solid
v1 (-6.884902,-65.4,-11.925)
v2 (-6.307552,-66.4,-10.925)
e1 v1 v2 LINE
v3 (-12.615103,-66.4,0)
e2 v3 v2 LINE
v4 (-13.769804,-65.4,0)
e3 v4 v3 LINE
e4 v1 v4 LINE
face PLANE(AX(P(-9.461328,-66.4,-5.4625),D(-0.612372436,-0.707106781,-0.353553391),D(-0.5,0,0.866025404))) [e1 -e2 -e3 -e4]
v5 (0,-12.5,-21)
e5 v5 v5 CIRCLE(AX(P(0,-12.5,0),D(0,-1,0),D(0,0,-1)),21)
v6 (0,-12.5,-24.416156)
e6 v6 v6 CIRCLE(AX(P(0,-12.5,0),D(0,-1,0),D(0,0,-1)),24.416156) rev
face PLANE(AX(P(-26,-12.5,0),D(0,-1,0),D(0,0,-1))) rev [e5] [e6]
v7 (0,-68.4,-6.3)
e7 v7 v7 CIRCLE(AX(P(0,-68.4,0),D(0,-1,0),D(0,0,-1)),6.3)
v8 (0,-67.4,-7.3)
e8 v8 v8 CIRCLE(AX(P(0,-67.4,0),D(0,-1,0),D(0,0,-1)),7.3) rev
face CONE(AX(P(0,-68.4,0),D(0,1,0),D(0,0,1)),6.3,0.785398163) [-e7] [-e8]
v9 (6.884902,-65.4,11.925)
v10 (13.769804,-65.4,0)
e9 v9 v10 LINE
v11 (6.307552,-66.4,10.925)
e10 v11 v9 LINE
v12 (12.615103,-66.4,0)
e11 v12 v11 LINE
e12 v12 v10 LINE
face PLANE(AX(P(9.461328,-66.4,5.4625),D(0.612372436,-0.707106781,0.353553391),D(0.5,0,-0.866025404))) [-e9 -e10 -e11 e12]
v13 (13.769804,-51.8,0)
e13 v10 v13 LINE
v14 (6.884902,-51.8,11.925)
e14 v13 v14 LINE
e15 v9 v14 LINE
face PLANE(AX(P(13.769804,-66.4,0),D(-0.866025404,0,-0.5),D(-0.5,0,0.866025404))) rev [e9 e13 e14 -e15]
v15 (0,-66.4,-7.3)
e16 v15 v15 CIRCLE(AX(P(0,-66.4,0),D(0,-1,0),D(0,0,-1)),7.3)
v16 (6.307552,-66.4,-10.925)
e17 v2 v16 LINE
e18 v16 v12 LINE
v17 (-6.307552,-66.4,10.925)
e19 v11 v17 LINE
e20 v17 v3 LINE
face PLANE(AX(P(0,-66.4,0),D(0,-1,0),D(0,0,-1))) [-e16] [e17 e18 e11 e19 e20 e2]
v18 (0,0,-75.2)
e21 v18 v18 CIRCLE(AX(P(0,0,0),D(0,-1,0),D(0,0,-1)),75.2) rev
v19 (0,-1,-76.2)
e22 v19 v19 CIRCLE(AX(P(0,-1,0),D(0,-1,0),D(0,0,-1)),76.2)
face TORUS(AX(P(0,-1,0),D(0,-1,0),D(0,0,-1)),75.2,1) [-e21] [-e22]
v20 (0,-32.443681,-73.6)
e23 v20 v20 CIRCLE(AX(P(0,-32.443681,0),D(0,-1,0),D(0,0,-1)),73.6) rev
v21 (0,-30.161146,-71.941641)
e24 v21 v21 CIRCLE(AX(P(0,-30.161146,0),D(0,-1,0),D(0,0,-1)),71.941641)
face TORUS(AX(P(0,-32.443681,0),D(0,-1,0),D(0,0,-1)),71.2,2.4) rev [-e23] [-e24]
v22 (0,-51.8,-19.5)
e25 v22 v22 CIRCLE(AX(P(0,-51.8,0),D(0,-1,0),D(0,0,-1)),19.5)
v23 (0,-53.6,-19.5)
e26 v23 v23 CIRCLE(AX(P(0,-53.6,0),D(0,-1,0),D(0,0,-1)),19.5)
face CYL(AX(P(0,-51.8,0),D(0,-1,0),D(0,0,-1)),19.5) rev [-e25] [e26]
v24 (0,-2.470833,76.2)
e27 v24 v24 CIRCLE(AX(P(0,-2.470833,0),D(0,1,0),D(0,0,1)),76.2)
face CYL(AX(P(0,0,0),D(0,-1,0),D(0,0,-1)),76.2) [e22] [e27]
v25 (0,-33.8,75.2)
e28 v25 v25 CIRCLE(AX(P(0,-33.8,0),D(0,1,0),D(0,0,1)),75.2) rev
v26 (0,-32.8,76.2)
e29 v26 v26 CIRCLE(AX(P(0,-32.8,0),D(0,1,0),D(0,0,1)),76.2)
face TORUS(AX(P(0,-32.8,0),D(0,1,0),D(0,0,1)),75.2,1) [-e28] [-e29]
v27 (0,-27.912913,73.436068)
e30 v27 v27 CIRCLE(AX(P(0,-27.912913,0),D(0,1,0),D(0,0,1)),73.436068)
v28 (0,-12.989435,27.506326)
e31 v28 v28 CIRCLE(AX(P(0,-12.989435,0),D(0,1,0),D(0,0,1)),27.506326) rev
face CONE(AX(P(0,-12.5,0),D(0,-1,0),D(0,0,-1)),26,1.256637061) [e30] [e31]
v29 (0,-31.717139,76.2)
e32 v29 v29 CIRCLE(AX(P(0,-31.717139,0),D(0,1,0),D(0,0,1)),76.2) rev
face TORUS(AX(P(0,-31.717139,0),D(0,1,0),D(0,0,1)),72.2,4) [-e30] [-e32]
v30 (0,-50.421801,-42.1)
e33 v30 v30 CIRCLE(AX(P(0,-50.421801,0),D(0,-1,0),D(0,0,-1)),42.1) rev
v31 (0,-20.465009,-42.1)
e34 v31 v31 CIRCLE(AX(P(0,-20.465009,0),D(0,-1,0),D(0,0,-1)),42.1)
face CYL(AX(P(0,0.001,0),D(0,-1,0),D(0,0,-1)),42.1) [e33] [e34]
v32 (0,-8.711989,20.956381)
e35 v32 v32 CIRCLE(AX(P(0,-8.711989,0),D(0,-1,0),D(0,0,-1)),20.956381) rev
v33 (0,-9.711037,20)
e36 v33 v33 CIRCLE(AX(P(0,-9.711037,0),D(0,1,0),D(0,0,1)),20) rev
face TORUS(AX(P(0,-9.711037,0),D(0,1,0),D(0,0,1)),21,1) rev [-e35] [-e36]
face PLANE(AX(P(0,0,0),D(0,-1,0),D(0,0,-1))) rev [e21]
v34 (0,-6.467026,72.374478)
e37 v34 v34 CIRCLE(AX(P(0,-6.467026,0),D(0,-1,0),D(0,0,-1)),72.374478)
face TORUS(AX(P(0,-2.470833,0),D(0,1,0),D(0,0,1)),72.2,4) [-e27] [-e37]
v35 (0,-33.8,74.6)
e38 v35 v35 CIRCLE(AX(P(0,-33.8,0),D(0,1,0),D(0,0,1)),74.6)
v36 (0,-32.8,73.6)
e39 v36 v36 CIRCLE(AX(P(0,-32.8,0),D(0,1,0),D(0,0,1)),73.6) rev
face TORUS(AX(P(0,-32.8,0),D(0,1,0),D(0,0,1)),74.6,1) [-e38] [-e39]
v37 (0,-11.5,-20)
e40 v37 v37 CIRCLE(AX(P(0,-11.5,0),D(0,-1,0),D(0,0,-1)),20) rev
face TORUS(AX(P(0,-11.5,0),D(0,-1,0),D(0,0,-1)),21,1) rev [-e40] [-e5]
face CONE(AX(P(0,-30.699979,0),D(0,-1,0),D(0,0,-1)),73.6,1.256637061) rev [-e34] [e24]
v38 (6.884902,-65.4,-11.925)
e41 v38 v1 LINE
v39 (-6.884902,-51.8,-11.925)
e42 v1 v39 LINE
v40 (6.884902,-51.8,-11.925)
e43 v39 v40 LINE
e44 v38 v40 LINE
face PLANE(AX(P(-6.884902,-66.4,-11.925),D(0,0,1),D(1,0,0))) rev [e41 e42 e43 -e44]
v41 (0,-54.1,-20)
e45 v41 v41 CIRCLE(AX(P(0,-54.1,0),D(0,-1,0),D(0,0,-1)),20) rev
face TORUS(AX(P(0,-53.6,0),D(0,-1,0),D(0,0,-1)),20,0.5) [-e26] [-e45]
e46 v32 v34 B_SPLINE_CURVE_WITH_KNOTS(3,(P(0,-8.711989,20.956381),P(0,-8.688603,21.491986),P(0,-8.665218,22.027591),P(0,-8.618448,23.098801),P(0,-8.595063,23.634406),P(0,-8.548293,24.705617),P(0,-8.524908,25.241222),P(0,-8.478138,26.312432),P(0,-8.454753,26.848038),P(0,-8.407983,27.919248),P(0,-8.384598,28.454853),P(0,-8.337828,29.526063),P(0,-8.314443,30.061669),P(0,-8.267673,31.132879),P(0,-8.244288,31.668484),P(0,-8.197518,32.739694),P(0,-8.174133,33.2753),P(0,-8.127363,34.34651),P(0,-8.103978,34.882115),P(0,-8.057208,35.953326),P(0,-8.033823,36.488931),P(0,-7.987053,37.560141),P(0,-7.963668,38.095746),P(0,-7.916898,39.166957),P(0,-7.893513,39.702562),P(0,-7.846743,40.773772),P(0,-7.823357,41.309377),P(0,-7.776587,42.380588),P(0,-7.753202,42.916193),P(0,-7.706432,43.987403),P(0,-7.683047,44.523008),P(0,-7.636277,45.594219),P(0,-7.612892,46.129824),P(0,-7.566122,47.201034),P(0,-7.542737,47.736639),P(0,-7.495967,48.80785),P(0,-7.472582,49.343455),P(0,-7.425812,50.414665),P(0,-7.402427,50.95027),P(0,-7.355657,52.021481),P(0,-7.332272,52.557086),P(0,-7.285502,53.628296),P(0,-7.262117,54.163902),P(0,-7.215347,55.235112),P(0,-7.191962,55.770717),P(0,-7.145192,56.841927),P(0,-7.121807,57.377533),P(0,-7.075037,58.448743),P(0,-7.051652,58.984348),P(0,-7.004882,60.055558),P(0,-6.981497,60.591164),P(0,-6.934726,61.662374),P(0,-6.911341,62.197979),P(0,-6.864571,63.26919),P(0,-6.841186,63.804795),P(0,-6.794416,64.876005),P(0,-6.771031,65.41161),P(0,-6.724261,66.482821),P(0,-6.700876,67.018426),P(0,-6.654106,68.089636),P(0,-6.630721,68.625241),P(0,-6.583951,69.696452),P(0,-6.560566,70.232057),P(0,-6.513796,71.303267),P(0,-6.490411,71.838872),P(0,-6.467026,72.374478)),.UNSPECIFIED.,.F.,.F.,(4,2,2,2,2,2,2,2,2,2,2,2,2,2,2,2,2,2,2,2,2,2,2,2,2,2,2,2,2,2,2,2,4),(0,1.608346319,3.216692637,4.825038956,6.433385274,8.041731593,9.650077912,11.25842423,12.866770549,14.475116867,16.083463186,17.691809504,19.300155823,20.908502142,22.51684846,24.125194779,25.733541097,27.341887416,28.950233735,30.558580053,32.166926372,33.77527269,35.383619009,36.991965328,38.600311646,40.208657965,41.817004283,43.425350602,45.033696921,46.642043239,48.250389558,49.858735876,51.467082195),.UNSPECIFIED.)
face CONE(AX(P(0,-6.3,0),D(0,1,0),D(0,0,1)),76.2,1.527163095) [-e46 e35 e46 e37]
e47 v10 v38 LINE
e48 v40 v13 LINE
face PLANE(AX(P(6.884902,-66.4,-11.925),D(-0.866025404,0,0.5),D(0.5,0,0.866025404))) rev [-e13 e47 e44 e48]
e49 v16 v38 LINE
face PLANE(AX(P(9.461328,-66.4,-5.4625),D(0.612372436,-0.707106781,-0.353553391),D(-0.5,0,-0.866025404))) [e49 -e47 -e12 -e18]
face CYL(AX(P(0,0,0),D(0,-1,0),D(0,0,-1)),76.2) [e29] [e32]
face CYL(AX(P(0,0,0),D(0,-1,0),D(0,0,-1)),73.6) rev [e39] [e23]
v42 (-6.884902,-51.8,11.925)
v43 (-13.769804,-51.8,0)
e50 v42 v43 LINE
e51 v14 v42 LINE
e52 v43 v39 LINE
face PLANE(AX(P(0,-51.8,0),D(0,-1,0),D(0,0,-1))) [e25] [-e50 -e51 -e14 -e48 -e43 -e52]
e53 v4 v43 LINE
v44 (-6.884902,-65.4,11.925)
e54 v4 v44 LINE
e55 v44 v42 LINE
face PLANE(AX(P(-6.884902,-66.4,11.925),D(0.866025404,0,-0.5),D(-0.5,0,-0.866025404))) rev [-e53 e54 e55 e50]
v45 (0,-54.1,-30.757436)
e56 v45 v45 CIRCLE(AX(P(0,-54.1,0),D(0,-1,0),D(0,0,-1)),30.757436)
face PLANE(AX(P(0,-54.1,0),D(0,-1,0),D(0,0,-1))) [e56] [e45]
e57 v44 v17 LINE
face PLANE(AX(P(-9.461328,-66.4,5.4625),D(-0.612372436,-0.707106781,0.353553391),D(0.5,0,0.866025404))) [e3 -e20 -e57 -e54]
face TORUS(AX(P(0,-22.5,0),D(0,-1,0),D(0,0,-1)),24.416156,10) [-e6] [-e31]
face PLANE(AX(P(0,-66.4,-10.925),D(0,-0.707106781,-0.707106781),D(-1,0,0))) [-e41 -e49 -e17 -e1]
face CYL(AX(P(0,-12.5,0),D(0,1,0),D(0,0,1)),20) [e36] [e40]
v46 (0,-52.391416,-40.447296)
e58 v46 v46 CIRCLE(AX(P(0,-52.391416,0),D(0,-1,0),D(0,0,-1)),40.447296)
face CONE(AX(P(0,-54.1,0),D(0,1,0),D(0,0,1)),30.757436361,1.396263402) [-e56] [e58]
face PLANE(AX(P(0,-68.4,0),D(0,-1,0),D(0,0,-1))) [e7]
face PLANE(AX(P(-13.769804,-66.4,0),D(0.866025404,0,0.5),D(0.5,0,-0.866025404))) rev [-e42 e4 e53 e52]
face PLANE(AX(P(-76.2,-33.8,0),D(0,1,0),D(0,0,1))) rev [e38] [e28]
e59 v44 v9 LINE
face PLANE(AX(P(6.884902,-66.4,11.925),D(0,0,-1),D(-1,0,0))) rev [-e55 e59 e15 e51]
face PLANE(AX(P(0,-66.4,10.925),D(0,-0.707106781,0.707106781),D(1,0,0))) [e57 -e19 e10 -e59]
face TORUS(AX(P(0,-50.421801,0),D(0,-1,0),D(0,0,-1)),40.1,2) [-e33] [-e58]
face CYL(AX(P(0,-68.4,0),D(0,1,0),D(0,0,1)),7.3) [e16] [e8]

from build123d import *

# Parameters (mm, degrees)
SKETCH3_R           = 20
BOSS_EXTRUDE1_DEPTH = 12.5
FILLET1_R           = 4
FILLET2_R           = 1
FILLET3_R           = 2.4
FILLET4_R           = 10
BOSS_EXTRUDE2_REACH = 150.374
BOSS_EXTRUDE2_START = 39
SKETCH5_R           = 42.1
CHAMFER1_SIZE       = 2
CHAMFER1_SIZE2      = 11.342563639
FILLET5_R           = 2
SKETCH6_R           = 19.5
CUT_EXTRUDE1_DEPTH  = 2.3
BOSS_EXTRUDE3_DEPTH = 14.6
SKETCH8_R           = 7.3
BOSS_EXTRUDE4_DEPTH = 2
CHAMFER2_SIZE       = 1
CHAMFER3_SIZE       = 1
FILLET6_R           = 0.5
FILLET7_R           = 1


with BuildPart() as part:
    # Sketch2 → Revolve1 (revolve)
    with BuildSketch(Plane.XY):
        Polygon((0, 0), (-76.2, 0), (-76.2, -6.3), (0, -9.62696385), align=None)
    revolve(axis=Axis((0, 0, 0), (0, 1, 0)))

    # Sketch3 → Boss-Extrude1 (add)
    with BuildSketch(Plane(origin=(0, 0, 0), x_dir=(1, 0, 0), z_dir=(0, 1, 0))):
        Circle(SKETCH3_R)
    extrude(amount=-BOSS_EXTRUDE1_DEPTH)

    # Sketch4 → Revolve2 (revolve)
    with BuildSketch(Plane.XY):
        Polygon((-26, -12.5), (0, -12.5), (0, -15.1), (-25.588200455, -15.1), (-73.6, -30.699979324), (-73.6, -33.8), (-76.2, -33.8), (-76.2, -28.810968751), align=None)
    revolve(axis=Axis((0, 0, 0), (0, 1, 0)))

    # Fillet1
    fillet1_edges = [part.edges().sort_by_distance(p)[0] for p in [
        (76.2, -28.810968751, 0),
        (76.2, -6.3, 0),
    ]]
    fillet(fillet1_edges, radius=FILLET1_R)

    # Fillet2
    fillet2_edges = [part.edges().sort_by_distance(p)[0] for p in [
        (76.2, 0, 0),
        (73.6, -33.8, 0),
        (76.2, -33.8, 0),
    ]]
    fillet(fillet2_edges, radius=FILLET2_R)

    # Fillet3
    fillet3_edges = [part.edges().sort_by_distance(p)[0] for p in [
        (73.6, -30.699979324, 0),
    ]]
    fillet(fillet3_edges, radius=FILLET3_R)

    # Fillet4
    fillet4_edges = [part.edges().sort_by_distance(p)[0] for p in [
        (26, -12.5, 0),
    ]]
    fillet(fillet4_edges, radius=FILLET4_R)

    # Boss-Extrude2: up to this cone (the profile starts inside it)
    boss_extrude2_end = Plane(origin=(0, -54.1, 0), z_dir=(0, -1, 0)).offset(-47.314109319) * Cone(3.078e-06, 1058.125969925, 343.805967724, align=(Align.CENTER, Align.CENTER, Align.MIN), mode=Mode.PRIVATE)
    # Sketch5 → Boss-Extrude2 (add, up to the surface)
    with BuildSketch(Plane.XZ.offset(15.1).offset(BOSS_EXTRUDE2_START), mode=Mode.PRIVATE) as boss_extrude2_sk1:
        Circle(SKETCH5_R)
    boss_extrude2_tool1 = extrude(boss_extrude2_sk1.sketch, amount=-BOSS_EXTRUDE2_REACH, mode=Mode.PRIVATE) & boss_extrude2_end
    add(boss_extrude2_tool1.solids().sort_by_distance((0, -54.1, 0))[0])

    # Chamfer1
    chamfer1_edges = [part.edges().sort_by_distance(p)[0] for p in [
        (-42.1, -54.1, 0),
    ]]
    chamfer1_side = [part.faces().sort_by_distance(p)[0] for p in [
        (-42.1, -37.282504446, 0),
    ]]
    chamfer(chamfer1_edges, length=CHAMFER1_SIZE, length2=CHAMFER1_SIZE2, reference=chamfer1_side[0])

    # Fillet5
    fillet5_edges = [part.edges().sort_by_distance(p)[0] for p in [
        (-42.1, -52.1, 0),
    ]]
    fillet(fillet5_edges, radius=FILLET5_R)

    # Sketch6 → Cut-Extrude1 (cut)
    with BuildSketch(Plane.XZ.offset(54.1)):
        Circle(SKETCH6_R)
    extrude(amount=-CUT_EXTRUDE1_DEPTH, mode=Mode.SUBTRACT)

    # Sketch7 → Boss-Extrude3 (add)
    with BuildSketch(Plane.XZ.offset(51.8)):
        Polygon((-6.88490196, 11.925), (-13.76980392, 0), (-6.88490196, -11.925), (6.88490196, -11.925), (13.76980392, 0), (6.88490196, 11.925), align=None)
    extrude(amount=BOSS_EXTRUDE3_DEPTH)

    # Sketch8 → Boss-Extrude4 (add)
    with BuildSketch(Plane.XZ.offset(66.4)):
        Circle(SKETCH8_R)
    extrude(amount=BOSS_EXTRUDE4_DEPTH)

    # Chamfer2
    chamfer2_edges = [part.edges().sort_by_distance(p)[0] for p in [
        (-7.3, -68.4, 0),
    ]]
    chamfer(chamfer2_edges, length=CHAMFER2_SIZE)

    # Chamfer3
    chamfer3_edges = [part.edges().sort_by_distance(p)[0] for p in [
        (0, -66.4, 11.925),
        (10.32735294, -66.4, 5.9625),
        (10.32735294, -66.4, -5.9625),
        (0, -66.4, -11.925),
        (-10.32735294, -66.4, 5.9625),
        (-10.32735294, -66.4, -5.9625),
    ]]
    chamfer(chamfer3_edges, length=CHAMFER3_SIZE)

    # Fillet6
    fillet6_edges = [part.edges().sort_by_distance(p)[0] for p in [
        (-19.5, -54.1, 0),
    ]]
    fillet(fillet6_edges, radius=FILLET6_R)

    # Fillet7
    fillet7_edges = [part.edges().sort_by_distance(p)[0] for p in [
        (-20, -12.5, 0),
        (0, -8.753744991, 20),
    ]]
    fillet(fillet7_edges, radius=FILLET7_R)


solid = part.part
